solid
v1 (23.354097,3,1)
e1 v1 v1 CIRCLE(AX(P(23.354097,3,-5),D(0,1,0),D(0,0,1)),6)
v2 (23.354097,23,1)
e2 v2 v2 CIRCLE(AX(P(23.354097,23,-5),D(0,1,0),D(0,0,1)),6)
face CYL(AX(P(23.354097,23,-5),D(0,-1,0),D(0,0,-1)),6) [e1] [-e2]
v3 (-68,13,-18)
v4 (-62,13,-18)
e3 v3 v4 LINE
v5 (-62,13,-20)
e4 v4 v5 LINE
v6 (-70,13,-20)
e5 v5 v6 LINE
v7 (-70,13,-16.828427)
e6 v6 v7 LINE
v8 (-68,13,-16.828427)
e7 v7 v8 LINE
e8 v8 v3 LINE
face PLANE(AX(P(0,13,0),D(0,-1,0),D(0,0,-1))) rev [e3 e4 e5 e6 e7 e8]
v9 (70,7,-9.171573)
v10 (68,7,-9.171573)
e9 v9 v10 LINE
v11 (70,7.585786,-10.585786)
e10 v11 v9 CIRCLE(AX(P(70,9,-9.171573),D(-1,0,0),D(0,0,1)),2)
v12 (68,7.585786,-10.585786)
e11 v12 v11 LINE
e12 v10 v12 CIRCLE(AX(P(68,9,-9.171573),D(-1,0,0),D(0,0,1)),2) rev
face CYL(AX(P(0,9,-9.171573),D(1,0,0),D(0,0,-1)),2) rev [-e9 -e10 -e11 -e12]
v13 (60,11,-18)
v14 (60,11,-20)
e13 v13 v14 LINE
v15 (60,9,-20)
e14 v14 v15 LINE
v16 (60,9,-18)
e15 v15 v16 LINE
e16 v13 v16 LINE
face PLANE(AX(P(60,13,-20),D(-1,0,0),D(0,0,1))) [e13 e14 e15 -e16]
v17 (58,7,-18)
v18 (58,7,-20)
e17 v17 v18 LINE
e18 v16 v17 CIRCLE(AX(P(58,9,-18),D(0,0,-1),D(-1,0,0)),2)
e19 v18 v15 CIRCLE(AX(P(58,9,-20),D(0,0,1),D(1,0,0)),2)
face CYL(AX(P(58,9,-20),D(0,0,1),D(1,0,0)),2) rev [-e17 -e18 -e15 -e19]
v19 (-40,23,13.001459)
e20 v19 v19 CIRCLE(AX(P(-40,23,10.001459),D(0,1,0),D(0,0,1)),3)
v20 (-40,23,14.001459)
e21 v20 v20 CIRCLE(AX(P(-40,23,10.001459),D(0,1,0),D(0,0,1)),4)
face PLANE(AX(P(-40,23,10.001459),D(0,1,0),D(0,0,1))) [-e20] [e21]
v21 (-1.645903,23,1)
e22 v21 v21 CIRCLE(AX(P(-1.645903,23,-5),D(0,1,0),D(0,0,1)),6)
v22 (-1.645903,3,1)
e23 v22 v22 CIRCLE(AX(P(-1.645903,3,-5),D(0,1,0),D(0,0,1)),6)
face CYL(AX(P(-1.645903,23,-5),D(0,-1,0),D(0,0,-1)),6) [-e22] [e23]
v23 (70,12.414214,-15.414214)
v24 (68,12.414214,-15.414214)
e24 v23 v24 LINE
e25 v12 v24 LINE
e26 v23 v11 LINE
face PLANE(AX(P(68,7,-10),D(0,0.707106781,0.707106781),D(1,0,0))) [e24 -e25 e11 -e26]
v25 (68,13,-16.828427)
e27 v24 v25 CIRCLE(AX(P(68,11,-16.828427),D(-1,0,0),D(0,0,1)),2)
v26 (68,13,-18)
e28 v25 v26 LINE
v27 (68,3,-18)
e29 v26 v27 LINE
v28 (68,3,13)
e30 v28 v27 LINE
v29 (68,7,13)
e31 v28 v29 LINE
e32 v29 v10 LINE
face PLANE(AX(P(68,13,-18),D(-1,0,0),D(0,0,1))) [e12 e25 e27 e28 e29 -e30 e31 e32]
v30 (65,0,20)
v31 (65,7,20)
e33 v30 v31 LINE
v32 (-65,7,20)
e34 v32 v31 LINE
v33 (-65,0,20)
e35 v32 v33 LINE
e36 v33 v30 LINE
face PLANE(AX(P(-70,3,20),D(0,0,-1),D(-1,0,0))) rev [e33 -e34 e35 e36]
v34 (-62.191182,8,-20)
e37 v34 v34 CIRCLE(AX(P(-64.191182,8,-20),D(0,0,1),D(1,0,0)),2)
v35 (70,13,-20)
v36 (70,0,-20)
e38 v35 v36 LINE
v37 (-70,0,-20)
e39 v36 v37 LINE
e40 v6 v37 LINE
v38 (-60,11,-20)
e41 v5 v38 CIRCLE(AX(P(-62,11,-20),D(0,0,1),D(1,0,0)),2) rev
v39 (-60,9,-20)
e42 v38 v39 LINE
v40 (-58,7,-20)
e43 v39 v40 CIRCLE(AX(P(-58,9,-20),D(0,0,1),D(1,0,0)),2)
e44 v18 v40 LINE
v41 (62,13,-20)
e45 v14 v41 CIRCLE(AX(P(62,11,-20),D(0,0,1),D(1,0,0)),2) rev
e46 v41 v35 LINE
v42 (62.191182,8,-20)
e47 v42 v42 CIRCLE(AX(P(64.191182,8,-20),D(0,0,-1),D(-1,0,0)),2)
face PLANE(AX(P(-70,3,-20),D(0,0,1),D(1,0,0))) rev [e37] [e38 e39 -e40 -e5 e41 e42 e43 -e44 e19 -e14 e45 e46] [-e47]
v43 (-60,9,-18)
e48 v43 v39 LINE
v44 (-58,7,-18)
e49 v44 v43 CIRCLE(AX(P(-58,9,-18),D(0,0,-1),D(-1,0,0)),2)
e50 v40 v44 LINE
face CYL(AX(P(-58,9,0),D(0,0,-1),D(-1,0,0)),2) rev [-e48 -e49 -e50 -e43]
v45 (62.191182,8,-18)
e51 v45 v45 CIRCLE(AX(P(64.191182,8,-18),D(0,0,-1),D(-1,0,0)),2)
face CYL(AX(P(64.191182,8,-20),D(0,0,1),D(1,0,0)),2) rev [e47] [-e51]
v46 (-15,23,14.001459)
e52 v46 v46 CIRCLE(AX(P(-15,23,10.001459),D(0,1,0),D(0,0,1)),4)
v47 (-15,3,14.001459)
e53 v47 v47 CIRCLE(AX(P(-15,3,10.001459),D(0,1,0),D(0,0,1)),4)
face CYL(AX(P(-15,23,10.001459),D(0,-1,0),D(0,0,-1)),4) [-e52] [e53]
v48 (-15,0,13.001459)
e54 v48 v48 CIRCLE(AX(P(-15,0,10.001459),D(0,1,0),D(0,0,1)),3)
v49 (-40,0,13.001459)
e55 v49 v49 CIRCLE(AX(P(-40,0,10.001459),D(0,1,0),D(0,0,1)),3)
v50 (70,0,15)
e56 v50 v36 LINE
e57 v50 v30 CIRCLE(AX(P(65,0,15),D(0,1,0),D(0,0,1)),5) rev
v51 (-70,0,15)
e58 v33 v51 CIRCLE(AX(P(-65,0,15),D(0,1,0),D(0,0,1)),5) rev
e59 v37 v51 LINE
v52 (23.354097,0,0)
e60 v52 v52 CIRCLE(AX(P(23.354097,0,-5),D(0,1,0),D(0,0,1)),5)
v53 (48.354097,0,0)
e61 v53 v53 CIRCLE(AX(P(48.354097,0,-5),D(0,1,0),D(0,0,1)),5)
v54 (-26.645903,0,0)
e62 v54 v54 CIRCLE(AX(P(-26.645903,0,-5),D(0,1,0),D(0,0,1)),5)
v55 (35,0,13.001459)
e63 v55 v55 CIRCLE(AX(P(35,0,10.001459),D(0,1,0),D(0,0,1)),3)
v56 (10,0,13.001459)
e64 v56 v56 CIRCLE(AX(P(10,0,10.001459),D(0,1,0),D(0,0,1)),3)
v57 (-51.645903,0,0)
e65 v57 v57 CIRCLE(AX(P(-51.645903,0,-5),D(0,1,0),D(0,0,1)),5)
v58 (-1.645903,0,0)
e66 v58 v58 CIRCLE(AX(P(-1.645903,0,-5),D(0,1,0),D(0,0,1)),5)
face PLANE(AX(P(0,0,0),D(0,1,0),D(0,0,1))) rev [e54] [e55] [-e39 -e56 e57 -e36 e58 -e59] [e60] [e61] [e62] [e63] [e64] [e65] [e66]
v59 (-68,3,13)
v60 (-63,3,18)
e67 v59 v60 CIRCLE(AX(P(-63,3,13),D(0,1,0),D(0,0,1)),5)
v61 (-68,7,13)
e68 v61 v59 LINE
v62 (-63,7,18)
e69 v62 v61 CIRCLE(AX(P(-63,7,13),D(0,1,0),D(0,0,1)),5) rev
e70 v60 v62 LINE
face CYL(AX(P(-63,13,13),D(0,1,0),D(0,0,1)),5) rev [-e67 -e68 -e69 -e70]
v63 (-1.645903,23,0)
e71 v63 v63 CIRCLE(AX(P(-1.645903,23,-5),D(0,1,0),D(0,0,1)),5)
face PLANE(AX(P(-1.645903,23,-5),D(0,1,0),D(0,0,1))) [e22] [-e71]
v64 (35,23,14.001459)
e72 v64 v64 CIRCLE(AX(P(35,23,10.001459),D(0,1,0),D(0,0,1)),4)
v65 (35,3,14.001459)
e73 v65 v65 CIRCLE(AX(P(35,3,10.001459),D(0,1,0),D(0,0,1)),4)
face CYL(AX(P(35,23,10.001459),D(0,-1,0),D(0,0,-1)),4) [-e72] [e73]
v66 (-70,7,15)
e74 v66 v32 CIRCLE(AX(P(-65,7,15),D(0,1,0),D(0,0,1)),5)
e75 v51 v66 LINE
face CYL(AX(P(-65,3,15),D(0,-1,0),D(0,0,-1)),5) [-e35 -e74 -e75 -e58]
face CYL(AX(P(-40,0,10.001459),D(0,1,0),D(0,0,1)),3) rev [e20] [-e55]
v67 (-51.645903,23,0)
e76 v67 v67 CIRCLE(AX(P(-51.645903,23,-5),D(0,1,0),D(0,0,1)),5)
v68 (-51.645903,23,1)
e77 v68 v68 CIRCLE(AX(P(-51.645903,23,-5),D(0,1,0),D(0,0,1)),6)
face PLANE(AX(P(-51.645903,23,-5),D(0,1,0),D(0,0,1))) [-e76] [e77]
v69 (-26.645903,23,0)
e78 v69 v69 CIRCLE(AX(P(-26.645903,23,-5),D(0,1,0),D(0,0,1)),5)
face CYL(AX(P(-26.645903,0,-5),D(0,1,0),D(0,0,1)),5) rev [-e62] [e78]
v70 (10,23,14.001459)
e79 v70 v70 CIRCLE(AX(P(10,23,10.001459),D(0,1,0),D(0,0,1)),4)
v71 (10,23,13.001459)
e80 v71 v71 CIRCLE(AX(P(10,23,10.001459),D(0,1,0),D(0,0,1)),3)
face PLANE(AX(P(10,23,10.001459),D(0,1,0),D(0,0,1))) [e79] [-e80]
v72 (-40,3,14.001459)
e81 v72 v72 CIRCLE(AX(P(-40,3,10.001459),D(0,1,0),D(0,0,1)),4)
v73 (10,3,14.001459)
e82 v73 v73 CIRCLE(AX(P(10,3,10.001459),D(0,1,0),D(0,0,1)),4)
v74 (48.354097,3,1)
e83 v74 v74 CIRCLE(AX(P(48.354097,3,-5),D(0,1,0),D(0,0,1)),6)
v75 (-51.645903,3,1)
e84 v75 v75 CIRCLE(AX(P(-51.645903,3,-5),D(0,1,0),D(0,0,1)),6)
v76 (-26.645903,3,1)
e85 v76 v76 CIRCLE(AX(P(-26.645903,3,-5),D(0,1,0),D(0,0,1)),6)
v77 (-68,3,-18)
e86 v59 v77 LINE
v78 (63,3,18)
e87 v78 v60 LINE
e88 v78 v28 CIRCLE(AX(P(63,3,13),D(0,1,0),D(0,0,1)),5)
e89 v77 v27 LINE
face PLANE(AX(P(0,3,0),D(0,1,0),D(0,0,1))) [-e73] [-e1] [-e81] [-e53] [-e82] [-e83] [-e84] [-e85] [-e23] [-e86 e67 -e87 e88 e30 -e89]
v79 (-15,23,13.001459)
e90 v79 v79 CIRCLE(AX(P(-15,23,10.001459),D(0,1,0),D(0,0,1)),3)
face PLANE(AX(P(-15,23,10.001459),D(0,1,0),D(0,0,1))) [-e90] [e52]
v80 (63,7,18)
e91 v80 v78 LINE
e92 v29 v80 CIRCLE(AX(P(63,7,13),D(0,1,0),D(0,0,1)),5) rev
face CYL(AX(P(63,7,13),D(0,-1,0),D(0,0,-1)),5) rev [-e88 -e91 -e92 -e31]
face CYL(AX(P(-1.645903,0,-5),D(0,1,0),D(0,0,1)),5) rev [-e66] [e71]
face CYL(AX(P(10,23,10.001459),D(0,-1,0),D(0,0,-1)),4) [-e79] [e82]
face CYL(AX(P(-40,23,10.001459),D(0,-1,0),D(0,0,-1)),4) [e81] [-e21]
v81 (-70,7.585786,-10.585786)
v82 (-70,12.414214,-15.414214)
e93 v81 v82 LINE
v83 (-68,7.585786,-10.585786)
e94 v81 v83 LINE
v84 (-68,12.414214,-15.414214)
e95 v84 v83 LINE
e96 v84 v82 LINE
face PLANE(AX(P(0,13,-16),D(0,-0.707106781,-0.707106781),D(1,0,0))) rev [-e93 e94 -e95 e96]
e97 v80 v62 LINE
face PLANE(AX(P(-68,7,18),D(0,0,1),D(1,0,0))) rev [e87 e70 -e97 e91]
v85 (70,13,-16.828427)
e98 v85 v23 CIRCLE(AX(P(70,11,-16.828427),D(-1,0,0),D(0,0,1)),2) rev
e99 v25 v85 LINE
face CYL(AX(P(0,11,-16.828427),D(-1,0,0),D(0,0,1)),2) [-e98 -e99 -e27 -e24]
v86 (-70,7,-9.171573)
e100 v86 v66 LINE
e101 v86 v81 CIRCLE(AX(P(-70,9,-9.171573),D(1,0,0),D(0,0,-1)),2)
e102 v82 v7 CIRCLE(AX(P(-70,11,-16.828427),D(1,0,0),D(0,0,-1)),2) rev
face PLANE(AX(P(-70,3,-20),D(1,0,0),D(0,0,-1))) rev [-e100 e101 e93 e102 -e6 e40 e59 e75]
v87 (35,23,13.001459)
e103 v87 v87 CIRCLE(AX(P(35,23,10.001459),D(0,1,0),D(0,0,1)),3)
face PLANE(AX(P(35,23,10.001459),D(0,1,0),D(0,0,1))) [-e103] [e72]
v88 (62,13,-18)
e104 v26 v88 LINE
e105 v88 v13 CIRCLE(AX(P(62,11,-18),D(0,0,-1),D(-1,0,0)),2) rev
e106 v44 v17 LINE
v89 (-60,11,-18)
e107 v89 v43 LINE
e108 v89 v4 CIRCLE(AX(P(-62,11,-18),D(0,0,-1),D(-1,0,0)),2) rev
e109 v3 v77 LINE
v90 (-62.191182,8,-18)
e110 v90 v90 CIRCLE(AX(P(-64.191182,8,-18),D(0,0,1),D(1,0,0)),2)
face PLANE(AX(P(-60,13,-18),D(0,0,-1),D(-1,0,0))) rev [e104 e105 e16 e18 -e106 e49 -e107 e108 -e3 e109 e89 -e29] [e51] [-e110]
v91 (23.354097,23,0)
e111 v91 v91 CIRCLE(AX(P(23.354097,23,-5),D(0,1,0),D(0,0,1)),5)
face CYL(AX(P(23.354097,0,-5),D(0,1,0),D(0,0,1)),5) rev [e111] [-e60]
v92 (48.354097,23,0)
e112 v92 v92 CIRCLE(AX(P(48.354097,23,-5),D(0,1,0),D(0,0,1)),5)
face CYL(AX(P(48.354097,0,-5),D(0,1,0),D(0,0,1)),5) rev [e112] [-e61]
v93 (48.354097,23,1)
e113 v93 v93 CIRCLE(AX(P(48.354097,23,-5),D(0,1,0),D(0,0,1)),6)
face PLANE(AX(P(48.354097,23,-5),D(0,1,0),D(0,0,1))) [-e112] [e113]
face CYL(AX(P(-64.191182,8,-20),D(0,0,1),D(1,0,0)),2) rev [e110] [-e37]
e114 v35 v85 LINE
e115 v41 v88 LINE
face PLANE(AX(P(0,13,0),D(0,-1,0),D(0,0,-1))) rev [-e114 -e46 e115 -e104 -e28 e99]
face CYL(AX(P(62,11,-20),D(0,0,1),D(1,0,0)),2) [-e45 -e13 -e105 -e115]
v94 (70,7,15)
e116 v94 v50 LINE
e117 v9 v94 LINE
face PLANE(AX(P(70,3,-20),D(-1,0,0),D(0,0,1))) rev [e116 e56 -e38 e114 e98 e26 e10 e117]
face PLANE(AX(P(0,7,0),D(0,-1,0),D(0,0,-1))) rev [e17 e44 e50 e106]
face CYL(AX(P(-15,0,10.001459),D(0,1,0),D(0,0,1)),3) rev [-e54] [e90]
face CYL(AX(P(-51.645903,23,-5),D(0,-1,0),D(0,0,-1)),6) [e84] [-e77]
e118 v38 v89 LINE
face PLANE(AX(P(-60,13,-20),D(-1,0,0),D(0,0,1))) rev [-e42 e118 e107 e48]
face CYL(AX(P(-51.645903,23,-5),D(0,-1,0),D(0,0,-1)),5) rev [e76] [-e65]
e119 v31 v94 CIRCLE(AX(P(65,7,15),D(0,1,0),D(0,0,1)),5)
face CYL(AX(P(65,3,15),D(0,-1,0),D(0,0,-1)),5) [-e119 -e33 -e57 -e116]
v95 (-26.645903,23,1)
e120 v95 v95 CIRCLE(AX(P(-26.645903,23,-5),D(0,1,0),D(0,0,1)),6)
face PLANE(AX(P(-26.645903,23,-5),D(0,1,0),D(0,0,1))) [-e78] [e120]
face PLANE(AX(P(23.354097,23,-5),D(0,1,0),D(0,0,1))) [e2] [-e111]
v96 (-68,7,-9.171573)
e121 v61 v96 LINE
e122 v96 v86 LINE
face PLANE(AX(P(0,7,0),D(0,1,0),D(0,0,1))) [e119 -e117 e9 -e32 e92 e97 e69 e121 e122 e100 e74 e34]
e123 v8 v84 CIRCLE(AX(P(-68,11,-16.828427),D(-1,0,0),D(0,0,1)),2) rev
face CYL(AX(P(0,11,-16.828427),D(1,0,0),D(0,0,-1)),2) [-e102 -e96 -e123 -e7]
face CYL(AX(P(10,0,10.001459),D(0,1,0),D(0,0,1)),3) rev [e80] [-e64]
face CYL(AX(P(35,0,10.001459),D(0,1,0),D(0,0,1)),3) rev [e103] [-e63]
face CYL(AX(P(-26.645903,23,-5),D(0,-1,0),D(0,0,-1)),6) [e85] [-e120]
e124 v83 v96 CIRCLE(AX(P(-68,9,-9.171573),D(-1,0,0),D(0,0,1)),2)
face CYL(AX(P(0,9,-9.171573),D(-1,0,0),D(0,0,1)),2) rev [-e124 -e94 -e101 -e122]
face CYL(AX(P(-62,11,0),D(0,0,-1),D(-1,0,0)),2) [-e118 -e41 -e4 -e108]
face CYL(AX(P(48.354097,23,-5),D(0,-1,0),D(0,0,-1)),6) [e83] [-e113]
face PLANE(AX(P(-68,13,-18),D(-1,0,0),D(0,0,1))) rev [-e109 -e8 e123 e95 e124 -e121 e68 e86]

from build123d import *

# Parameters (mm, degrees)
ESQUISSE1_W                      = 140
ESQUISSE1_H                      = 40
BOSS_EXTRU_1_DEPTH               = 3
ESQUISSE2_R                      = 6
ESQUISSE2_R_2                    = 5
BOSS_EXTRU_2_DEPTH               = 20
ESQUISSE7_R                      = 5
ENL_V_MAT_EXTRU_3_DEPTH          = 76.498344353
R_P_TITION_LIN_AIRE3_OUTLINE_R   = 5
R_P_TITION_LIN_AIRE3_DEPTH       = 3
R_P_TITION_START                 = 3
R_P_TITION_LIN_AIRE3_2_OUTLINE_R = 6
R_P_TITION_LIN_AIRE3_2_DEPTH     = 20
ESQUISSE8_R                      = 5
ENL_V_MAT_EXTRU_4_DEPTH          = 77.347887987
R_P_TITION_LIN_AIRE4_COUNT       = 4
R_P_TITION_LIN_AIRE4_PITCH       = 25
ESQUISSE9_R                      = 4
BOSS_EXTRU_4_DEPTH               = 20
ESQUISSE12_R                     = 3
ENL_V_MAT_EXTRU_6_DEPTH          = 77.347887987
R_P_TITION_LIN_AIRE5_COUNT       = 4
R_P_TITION_LIN_AIRE5_PITCH       = 25
BOSS_EXTRU_5_DEPTH               = 10
CHANFREIN1_SIZE                  = 6
ESQUISSE15_R                     = 2
ENL_V_MAT_EXTRU_7_DEPTH          = 83.903558428
ESQUISSE18_W                     = 60
ESQUISSE18_H                     = 2
BOSS_EXTRU_6_DEPTH               = 4
CONG_2_R                         = 5
CONG_3_R                         = 2
SYM_TRIE1_OUTLINE_W              = 4
SYM_TRIE1_OUTLINE_H              = 2
SYM_TRIE1_DEPTH                  = 62.191181732
SYM_TRIE1_START                  = 68
SYM_TRIE1_2_DEPTH                = 2
SYM_TRIE1_START_2                = 66.191181932
SYM_TRIE1_3_OUTLINE_W            = 10
SYM_TRIE1_3_OUTLINE_H            = 2
SYM_TRIE1_3_OUTLINE_W_2          = 4
SYM_TRIE1_3_DEPTH                = 1.808818068
SYM_TRIE1_START_3                = 62
SYM_TRIE1_4_OUTLINE_W            = 4
SYM_TRIE1_4_OUTLINE_H            = 2
SYM_TRIE1_4_DEPTH                = 6
SYM_TRIE1_5_OUTLINE_W            = 6
SYM_TRIE1_5_OUTLINE_H            = 2
SYM_TRIE1_5_DEPTH                = 0.191181732
SYM_TRIE1_START_4                = -20
SYM_TRIE1_6_DEPTH                = 2
SYM_TRIE1_START_5                = 2
SYM_TRIE1_7_DEPTH                = 5
CONG_4_R                         = 5


with BuildPart() as part:
    # Esquisse1 → Boss.-Extru.1 (new body)
    with BuildSketch(Plane(origin=(0, 0, 0), x_dir=(1, 0, 0), z_dir=(0, 1, 0))):
        Rectangle(ESQUISSE1_W, ESQUISSE1_H)
    extrude(amount=BOSS_EXTRU_1_DEPTH)

    # Esquisse2 → Boss.-Extru.2 (add)
    with BuildSketch(Plane(origin=(0, 3, 0), x_dir=(1, 0, 0), z_dir=(0, 1, 0))):
        with Locations(Location((-51.645903367, 5, 0), (0, 0, 270))):
            Circle(ESQUISSE2_R)
        with Locations(Location((-51.645903367, 5, 0), (0, 0, 270))):
            Circle(ESQUISSE2_R_2, mode=Mode.SUBTRACT)
    extrude(amount=BOSS_EXTRU_2_DEPTH)

    # Esquisse7 → Enlèv. mat.-Extru.3 (cut, through all)
    with BuildSketch(Plane(origin=(0, 3, 0), x_dir=(1, 0, 0), z_dir=(0, 1, 0))):
        with Locations(Location((-51.645903367, 5, 0), (0, 0, 270))):
            Circle(ESQUISSE7_R)
    extrude(amount=-ENL_V_MAT_EXTRU_3_DEPTH, mode=Mode.SUBTRACT)

    # Répétition linéaire3: read off the stored shape, not the designer's step
    # Répétition linéaire3 outline → Répétition linéaire3 (cut)
    with BuildSketch(Plane(origin=(0, 0, 0), x_dir=(1, 0, 0), z_dir=(0, 1, 0))):
        with Locations((-26.645903367, 5)):
            Circle(R_P_TITION_LIN_AIRE3_OUTLINE_R)
        with Locations((48.354096633, 5)):
            Circle(R_P_TITION_LIN_AIRE3_OUTLINE_R)
        with Locations((23.354096633, 5)):
            Circle(R_P_TITION_LIN_AIRE3_OUTLINE_R)
        with Locations((-1.645903367, 5)):
            Circle(R_P_TITION_LIN_AIRE3_OUTLINE_R)
    extrude(amount=R_P_TITION_LIN_AIRE3_DEPTH, mode=Mode.SUBTRACT)

    # R_p_tition lin_aire3 2 outline → R_p_tition lin_aire3 2 (add)
    with BuildSketch(Plane(origin=(0, 0, 0), x_dir=(1, 0, 0), z_dir=(0, 1, 0)).offset(R_P_TITION_START)):
        with Locations((48.354096633, 5)):
            Circle(R_P_TITION_LIN_AIRE3_2_OUTLINE_R)
        with Locations((23.354096633, 5)):
            Circle(R_P_TITION_LIN_AIRE3_2_OUTLINE_R)
        with Locations((-1.645903367, 5)):
            Circle(R_P_TITION_LIN_AIRE3_2_OUTLINE_R)
        with Locations((-26.645903367, 5)):
            Circle(R_P_TITION_LIN_AIRE3_2_OUTLINE_R)
    extrude(amount=R_P_TITION_LIN_AIRE3_2_DEPTH)

    # Esquisse8 → Enlèv. mat.-Extru.4 (cut, through all)
    with BuildSketch(Plane(origin=(0, 23, 0), x_dir=(1, 0, 0), z_dir=(0, 1, 0))):
        with Locations(Location((-26.645903367, 5, 0), (0, 0, 270))):
            Circle(ESQUISSE8_R)
    enl_v_mat_extru_4 = extrude(amount=-ENL_V_MAT_EXTRU_4_DEPTH, mode=Mode.SUBTRACT)

    # Répétition linéaire4: Enlèv. mat.-Extru.4 ×4
    with Locations(*[(i * R_P_TITION_LIN_AIRE4_PITCH, 0, 0) for i in range(1, R_P_TITION_LIN_AIRE4_COUNT)]):
        add(enl_v_mat_extru_4, mode=Mode.SUBTRACT)

    # Esquisse9 → Boss.-Extru.4 (add)
    with BuildSketch(Plane(origin=(0, 3, 0), x_dir=(1, 0, 0), z_dir=(0, 1, 0))):
        with Locations(Location((-40, -10.001459341, 0), (0, 0, 270))):
            Circle(ESQUISSE9_R)
    boss_extru_4 = extrude(amount=BOSS_EXTRU_4_DEPTH)

    # Esquisse12 → Enlèv. mat.-Extru.6 (cut, through all)
    with BuildSketch(Plane(origin=(0, 23, 0), x_dir=(1, 0, 0), z_dir=(0, 1, 0))):
        with Locations(Location((-40, -10.001459341, 0), (0, 0, 270))):
            Circle(ESQUISSE12_R)
    enl_v_mat_extru_6 = extrude(amount=-ENL_V_MAT_EXTRU_6_DEPTH, mode=Mode.SUBTRACT)

    # Répétition linéaire5: Boss.-Extru.4, Enlèv. mat.-Extru.6 ×4
    with Locations(*[(i * R_P_TITION_LIN_AIRE5_PITCH, 0, 0) for i in range(1, R_P_TITION_LIN_AIRE5_COUNT)]):
        add(boss_extru_4)
        add(enl_v_mat_extru_6, mode=Mode.SUBTRACT)

    # Esquisse13 → Boss.-Extru.5 (add)
    with BuildSketch(Plane(origin=(0, 3, 0), x_dir=(1, 0, 0), z_dir=(0, 1, 0))):
        Polygon((-70, 20), (-60, 20), (-60, 18), (-68, 18), (-68, 10), (-70, 10), align=None)
    extrude(amount=BOSS_EXTRU_5_DEPTH)

    # Chanfrein1
    chanfrein1_edges = [part.edges().sort_by_distance(p)[0] for p in [
        (-69, 13, -10),
    ]]
    chamfer(chanfrein1_edges, length=CHANFREIN1_SIZE)

    # Esquisse15 → Enlèv. mat.-Extru.7 (cut, through all)
    with BuildSketch(Plane.XY.offset(-18)):
        with Locations((-64.191181832, 8)):
            Circle(ESQUISSE15_R)
    extrude(amount=-ENL_V_MAT_EXTRU_7_DEPTH, mode=Mode.SUBTRACT)

    # Esquisse18 → Boss.-Extru.6 (add)
    with BuildSketch(Plane(origin=(0, 3, 0), x_dir=(1, 0, 0), z_dir=(0, 1, 0))):
        Polygon((-68, 10), (-68, -18), (0, -18), (0, -20), (-70, -20), (-70, 10), align=None)
        with Locations((-30, 19)):
            Rectangle(ESQUISSE18_W, ESQUISSE18_H)
    extrude(amount=BOSS_EXTRU_6_DEPTH)

    # Congé2
    cong_2_edges = [part.edges().sort_by_distance(p)[0] for p in [
        (-68, 5, 18),
        (-70, 3.5, 20),
    ]]
    fillet(cong_2_edges, radius=CONG_2_R)

    # Congé3
    cong_3_edges = [part.edges().sort_by_distance(p)[0] for p in [
        (-60, 13, -19),
        (-69, 13, -16),
        (-69, 7, -10),
        (-60, 7, -19),
    ]]
    fillet(cong_3_edges, radius=CONG_3_R)

    # Symétrie1: read off the stored shape, not the designer's step
    # Symétrie1 outline → Symétrie1 (add)
    with BuildSketch(Plane.YZ):
        with Locations((5, -19)):
            Rectangle(SYM_TRIE1_OUTLINE_W, SYM_TRIE1_OUTLINE_H)
        with Locations((5, 19)):
            Rectangle(SYM_TRIE1_OUTLINE_W, SYM_TRIE1_OUTLINE_H)
    extrude(amount=SYM_TRIE1_DEPTH)

    # Sym_trie1 2 outline → Sym_trie1 2 (add)
    with BuildSketch(Plane.YZ.offset(SYM_TRIE1_START)):
        with BuildLine():
            Line((13, -20), (13, -16.828427125))
            ThreePointArc((13, -16.828427125), (12.847759065, -16.06306026), (12.414213562, -15.414213562))
            Line((12.414213562, -15.414213562), (7.585786438, -10.585786438))
            ThreePointArc((7.585786438, -10.585786438), (7.152240935, -9.93693974), (7, -9.171572875))
            Line((7, -9.171572875), (7, 20))
            Line((7, 20), (3, 20))
            Line((3, 20), (3, -20))
            Line((3, -20), (13, -20))
        make_face()
    extrude(amount=SYM_TRIE1_2_DEPTH)

    # Sym_trie1 3 outline → Sym_trie1 3 (add)
    with BuildSketch(Plane.YZ.offset(SYM_TRIE1_START_2)):
        with Locations((8, -19)):
            Rectangle(SYM_TRIE1_3_OUTLINE_W, SYM_TRIE1_3_OUTLINE_H)
        with Locations((5, 19)):
            Rectangle(SYM_TRIE1_3_OUTLINE_W_2, SYM_TRIE1_3_OUTLINE_H)
    extrude(amount=SYM_TRIE1_3_DEPTH)

    # Sym_trie1 4 outline → Sym_trie1 4 (add)
    with BuildSketch(Plane.YZ.offset(SYM_TRIE1_START_3)):
        with Locations((5, 19)):
            Rectangle(SYM_TRIE1_4_OUTLINE_W, SYM_TRIE1_4_OUTLINE_H)
    extrude(amount=SYM_TRIE1_4_DEPTH)

    # Sym_trie1 5 outline → Sym_trie1 5 (add)
    with BuildSketch(Plane.YZ.offset(SYM_TRIE1_START_3)):
        with Locations((10, -19)):
            Rectangle(SYM_TRIE1_5_OUTLINE_W, SYM_TRIE1_5_OUTLINE_H)
    extrude(amount=SYM_TRIE1_5_DEPTH)

    # Sym_trie1 6 outline → Sym_trie1 6 (add)
    with BuildSketch(Plane.XY.offset(SYM_TRIE1_START_4)):
        with BuildLine():
            ThreePointArc((62, 13), (60.585786438, 12.414213562), (60, 11))
            Line((60, 11), (60, 9))
            ThreePointArc((60, 9), (59.414213562, 7.585786438), (58, 7))
            Line((58, 7), (62, 7))
            Line((62, 7), (62, 13))
        make_face()
        with BuildLine():
            Line((66.191181932, 13), (62.191181732, 13))
            Line((62.191181732, 13), (62.191181832, 8))
            ThreePointArc((62.191181832, 8), (64.191181832, 10), (66.191181832, 8))
            Line((66.191181832, 8), (66.191181932, 13))
        make_face()
        with BuildLine():
            Line((62.191181832, 8), (62.191181732, 3))
            Line((62.191181732, 3), (66.191181932, 3))
            Line((66.191181932, 3), (66.191181832, 8))
            ThreePointArc((66.191181832, 8), (64.191181832, 6), (62.191181832, 8))
        make_face()
    extrude(amount=SYM_TRIE1_6_DEPTH)

    # Sym_trie1 7 outline → Sym_trie1 7 (add)
    with BuildSketch(Plane(origin=(0, 0, 0), x_dir=(1, 0, 0), z_dir=(0, 1, 0)).offset(SYM_TRIE1_START_5)):
        with BuildLine():
            Line((68, -18), (68, -13))
            ThreePointArc((68, -13), (66.535533906, -16.535533906), (63, -18))
            Line((63, -18), (68, -18))
        make_face()
    extrude(amount=SYM_TRIE1_7_DEPTH)

    # Congé4
    cong_4_edges = [part.edges().sort_by_distance(p)[0] for p in [
        (70, 3.5, 20),
    ]]
    fillet(cong_4_edges, radius=CONG_4_R)


solid = part.part
